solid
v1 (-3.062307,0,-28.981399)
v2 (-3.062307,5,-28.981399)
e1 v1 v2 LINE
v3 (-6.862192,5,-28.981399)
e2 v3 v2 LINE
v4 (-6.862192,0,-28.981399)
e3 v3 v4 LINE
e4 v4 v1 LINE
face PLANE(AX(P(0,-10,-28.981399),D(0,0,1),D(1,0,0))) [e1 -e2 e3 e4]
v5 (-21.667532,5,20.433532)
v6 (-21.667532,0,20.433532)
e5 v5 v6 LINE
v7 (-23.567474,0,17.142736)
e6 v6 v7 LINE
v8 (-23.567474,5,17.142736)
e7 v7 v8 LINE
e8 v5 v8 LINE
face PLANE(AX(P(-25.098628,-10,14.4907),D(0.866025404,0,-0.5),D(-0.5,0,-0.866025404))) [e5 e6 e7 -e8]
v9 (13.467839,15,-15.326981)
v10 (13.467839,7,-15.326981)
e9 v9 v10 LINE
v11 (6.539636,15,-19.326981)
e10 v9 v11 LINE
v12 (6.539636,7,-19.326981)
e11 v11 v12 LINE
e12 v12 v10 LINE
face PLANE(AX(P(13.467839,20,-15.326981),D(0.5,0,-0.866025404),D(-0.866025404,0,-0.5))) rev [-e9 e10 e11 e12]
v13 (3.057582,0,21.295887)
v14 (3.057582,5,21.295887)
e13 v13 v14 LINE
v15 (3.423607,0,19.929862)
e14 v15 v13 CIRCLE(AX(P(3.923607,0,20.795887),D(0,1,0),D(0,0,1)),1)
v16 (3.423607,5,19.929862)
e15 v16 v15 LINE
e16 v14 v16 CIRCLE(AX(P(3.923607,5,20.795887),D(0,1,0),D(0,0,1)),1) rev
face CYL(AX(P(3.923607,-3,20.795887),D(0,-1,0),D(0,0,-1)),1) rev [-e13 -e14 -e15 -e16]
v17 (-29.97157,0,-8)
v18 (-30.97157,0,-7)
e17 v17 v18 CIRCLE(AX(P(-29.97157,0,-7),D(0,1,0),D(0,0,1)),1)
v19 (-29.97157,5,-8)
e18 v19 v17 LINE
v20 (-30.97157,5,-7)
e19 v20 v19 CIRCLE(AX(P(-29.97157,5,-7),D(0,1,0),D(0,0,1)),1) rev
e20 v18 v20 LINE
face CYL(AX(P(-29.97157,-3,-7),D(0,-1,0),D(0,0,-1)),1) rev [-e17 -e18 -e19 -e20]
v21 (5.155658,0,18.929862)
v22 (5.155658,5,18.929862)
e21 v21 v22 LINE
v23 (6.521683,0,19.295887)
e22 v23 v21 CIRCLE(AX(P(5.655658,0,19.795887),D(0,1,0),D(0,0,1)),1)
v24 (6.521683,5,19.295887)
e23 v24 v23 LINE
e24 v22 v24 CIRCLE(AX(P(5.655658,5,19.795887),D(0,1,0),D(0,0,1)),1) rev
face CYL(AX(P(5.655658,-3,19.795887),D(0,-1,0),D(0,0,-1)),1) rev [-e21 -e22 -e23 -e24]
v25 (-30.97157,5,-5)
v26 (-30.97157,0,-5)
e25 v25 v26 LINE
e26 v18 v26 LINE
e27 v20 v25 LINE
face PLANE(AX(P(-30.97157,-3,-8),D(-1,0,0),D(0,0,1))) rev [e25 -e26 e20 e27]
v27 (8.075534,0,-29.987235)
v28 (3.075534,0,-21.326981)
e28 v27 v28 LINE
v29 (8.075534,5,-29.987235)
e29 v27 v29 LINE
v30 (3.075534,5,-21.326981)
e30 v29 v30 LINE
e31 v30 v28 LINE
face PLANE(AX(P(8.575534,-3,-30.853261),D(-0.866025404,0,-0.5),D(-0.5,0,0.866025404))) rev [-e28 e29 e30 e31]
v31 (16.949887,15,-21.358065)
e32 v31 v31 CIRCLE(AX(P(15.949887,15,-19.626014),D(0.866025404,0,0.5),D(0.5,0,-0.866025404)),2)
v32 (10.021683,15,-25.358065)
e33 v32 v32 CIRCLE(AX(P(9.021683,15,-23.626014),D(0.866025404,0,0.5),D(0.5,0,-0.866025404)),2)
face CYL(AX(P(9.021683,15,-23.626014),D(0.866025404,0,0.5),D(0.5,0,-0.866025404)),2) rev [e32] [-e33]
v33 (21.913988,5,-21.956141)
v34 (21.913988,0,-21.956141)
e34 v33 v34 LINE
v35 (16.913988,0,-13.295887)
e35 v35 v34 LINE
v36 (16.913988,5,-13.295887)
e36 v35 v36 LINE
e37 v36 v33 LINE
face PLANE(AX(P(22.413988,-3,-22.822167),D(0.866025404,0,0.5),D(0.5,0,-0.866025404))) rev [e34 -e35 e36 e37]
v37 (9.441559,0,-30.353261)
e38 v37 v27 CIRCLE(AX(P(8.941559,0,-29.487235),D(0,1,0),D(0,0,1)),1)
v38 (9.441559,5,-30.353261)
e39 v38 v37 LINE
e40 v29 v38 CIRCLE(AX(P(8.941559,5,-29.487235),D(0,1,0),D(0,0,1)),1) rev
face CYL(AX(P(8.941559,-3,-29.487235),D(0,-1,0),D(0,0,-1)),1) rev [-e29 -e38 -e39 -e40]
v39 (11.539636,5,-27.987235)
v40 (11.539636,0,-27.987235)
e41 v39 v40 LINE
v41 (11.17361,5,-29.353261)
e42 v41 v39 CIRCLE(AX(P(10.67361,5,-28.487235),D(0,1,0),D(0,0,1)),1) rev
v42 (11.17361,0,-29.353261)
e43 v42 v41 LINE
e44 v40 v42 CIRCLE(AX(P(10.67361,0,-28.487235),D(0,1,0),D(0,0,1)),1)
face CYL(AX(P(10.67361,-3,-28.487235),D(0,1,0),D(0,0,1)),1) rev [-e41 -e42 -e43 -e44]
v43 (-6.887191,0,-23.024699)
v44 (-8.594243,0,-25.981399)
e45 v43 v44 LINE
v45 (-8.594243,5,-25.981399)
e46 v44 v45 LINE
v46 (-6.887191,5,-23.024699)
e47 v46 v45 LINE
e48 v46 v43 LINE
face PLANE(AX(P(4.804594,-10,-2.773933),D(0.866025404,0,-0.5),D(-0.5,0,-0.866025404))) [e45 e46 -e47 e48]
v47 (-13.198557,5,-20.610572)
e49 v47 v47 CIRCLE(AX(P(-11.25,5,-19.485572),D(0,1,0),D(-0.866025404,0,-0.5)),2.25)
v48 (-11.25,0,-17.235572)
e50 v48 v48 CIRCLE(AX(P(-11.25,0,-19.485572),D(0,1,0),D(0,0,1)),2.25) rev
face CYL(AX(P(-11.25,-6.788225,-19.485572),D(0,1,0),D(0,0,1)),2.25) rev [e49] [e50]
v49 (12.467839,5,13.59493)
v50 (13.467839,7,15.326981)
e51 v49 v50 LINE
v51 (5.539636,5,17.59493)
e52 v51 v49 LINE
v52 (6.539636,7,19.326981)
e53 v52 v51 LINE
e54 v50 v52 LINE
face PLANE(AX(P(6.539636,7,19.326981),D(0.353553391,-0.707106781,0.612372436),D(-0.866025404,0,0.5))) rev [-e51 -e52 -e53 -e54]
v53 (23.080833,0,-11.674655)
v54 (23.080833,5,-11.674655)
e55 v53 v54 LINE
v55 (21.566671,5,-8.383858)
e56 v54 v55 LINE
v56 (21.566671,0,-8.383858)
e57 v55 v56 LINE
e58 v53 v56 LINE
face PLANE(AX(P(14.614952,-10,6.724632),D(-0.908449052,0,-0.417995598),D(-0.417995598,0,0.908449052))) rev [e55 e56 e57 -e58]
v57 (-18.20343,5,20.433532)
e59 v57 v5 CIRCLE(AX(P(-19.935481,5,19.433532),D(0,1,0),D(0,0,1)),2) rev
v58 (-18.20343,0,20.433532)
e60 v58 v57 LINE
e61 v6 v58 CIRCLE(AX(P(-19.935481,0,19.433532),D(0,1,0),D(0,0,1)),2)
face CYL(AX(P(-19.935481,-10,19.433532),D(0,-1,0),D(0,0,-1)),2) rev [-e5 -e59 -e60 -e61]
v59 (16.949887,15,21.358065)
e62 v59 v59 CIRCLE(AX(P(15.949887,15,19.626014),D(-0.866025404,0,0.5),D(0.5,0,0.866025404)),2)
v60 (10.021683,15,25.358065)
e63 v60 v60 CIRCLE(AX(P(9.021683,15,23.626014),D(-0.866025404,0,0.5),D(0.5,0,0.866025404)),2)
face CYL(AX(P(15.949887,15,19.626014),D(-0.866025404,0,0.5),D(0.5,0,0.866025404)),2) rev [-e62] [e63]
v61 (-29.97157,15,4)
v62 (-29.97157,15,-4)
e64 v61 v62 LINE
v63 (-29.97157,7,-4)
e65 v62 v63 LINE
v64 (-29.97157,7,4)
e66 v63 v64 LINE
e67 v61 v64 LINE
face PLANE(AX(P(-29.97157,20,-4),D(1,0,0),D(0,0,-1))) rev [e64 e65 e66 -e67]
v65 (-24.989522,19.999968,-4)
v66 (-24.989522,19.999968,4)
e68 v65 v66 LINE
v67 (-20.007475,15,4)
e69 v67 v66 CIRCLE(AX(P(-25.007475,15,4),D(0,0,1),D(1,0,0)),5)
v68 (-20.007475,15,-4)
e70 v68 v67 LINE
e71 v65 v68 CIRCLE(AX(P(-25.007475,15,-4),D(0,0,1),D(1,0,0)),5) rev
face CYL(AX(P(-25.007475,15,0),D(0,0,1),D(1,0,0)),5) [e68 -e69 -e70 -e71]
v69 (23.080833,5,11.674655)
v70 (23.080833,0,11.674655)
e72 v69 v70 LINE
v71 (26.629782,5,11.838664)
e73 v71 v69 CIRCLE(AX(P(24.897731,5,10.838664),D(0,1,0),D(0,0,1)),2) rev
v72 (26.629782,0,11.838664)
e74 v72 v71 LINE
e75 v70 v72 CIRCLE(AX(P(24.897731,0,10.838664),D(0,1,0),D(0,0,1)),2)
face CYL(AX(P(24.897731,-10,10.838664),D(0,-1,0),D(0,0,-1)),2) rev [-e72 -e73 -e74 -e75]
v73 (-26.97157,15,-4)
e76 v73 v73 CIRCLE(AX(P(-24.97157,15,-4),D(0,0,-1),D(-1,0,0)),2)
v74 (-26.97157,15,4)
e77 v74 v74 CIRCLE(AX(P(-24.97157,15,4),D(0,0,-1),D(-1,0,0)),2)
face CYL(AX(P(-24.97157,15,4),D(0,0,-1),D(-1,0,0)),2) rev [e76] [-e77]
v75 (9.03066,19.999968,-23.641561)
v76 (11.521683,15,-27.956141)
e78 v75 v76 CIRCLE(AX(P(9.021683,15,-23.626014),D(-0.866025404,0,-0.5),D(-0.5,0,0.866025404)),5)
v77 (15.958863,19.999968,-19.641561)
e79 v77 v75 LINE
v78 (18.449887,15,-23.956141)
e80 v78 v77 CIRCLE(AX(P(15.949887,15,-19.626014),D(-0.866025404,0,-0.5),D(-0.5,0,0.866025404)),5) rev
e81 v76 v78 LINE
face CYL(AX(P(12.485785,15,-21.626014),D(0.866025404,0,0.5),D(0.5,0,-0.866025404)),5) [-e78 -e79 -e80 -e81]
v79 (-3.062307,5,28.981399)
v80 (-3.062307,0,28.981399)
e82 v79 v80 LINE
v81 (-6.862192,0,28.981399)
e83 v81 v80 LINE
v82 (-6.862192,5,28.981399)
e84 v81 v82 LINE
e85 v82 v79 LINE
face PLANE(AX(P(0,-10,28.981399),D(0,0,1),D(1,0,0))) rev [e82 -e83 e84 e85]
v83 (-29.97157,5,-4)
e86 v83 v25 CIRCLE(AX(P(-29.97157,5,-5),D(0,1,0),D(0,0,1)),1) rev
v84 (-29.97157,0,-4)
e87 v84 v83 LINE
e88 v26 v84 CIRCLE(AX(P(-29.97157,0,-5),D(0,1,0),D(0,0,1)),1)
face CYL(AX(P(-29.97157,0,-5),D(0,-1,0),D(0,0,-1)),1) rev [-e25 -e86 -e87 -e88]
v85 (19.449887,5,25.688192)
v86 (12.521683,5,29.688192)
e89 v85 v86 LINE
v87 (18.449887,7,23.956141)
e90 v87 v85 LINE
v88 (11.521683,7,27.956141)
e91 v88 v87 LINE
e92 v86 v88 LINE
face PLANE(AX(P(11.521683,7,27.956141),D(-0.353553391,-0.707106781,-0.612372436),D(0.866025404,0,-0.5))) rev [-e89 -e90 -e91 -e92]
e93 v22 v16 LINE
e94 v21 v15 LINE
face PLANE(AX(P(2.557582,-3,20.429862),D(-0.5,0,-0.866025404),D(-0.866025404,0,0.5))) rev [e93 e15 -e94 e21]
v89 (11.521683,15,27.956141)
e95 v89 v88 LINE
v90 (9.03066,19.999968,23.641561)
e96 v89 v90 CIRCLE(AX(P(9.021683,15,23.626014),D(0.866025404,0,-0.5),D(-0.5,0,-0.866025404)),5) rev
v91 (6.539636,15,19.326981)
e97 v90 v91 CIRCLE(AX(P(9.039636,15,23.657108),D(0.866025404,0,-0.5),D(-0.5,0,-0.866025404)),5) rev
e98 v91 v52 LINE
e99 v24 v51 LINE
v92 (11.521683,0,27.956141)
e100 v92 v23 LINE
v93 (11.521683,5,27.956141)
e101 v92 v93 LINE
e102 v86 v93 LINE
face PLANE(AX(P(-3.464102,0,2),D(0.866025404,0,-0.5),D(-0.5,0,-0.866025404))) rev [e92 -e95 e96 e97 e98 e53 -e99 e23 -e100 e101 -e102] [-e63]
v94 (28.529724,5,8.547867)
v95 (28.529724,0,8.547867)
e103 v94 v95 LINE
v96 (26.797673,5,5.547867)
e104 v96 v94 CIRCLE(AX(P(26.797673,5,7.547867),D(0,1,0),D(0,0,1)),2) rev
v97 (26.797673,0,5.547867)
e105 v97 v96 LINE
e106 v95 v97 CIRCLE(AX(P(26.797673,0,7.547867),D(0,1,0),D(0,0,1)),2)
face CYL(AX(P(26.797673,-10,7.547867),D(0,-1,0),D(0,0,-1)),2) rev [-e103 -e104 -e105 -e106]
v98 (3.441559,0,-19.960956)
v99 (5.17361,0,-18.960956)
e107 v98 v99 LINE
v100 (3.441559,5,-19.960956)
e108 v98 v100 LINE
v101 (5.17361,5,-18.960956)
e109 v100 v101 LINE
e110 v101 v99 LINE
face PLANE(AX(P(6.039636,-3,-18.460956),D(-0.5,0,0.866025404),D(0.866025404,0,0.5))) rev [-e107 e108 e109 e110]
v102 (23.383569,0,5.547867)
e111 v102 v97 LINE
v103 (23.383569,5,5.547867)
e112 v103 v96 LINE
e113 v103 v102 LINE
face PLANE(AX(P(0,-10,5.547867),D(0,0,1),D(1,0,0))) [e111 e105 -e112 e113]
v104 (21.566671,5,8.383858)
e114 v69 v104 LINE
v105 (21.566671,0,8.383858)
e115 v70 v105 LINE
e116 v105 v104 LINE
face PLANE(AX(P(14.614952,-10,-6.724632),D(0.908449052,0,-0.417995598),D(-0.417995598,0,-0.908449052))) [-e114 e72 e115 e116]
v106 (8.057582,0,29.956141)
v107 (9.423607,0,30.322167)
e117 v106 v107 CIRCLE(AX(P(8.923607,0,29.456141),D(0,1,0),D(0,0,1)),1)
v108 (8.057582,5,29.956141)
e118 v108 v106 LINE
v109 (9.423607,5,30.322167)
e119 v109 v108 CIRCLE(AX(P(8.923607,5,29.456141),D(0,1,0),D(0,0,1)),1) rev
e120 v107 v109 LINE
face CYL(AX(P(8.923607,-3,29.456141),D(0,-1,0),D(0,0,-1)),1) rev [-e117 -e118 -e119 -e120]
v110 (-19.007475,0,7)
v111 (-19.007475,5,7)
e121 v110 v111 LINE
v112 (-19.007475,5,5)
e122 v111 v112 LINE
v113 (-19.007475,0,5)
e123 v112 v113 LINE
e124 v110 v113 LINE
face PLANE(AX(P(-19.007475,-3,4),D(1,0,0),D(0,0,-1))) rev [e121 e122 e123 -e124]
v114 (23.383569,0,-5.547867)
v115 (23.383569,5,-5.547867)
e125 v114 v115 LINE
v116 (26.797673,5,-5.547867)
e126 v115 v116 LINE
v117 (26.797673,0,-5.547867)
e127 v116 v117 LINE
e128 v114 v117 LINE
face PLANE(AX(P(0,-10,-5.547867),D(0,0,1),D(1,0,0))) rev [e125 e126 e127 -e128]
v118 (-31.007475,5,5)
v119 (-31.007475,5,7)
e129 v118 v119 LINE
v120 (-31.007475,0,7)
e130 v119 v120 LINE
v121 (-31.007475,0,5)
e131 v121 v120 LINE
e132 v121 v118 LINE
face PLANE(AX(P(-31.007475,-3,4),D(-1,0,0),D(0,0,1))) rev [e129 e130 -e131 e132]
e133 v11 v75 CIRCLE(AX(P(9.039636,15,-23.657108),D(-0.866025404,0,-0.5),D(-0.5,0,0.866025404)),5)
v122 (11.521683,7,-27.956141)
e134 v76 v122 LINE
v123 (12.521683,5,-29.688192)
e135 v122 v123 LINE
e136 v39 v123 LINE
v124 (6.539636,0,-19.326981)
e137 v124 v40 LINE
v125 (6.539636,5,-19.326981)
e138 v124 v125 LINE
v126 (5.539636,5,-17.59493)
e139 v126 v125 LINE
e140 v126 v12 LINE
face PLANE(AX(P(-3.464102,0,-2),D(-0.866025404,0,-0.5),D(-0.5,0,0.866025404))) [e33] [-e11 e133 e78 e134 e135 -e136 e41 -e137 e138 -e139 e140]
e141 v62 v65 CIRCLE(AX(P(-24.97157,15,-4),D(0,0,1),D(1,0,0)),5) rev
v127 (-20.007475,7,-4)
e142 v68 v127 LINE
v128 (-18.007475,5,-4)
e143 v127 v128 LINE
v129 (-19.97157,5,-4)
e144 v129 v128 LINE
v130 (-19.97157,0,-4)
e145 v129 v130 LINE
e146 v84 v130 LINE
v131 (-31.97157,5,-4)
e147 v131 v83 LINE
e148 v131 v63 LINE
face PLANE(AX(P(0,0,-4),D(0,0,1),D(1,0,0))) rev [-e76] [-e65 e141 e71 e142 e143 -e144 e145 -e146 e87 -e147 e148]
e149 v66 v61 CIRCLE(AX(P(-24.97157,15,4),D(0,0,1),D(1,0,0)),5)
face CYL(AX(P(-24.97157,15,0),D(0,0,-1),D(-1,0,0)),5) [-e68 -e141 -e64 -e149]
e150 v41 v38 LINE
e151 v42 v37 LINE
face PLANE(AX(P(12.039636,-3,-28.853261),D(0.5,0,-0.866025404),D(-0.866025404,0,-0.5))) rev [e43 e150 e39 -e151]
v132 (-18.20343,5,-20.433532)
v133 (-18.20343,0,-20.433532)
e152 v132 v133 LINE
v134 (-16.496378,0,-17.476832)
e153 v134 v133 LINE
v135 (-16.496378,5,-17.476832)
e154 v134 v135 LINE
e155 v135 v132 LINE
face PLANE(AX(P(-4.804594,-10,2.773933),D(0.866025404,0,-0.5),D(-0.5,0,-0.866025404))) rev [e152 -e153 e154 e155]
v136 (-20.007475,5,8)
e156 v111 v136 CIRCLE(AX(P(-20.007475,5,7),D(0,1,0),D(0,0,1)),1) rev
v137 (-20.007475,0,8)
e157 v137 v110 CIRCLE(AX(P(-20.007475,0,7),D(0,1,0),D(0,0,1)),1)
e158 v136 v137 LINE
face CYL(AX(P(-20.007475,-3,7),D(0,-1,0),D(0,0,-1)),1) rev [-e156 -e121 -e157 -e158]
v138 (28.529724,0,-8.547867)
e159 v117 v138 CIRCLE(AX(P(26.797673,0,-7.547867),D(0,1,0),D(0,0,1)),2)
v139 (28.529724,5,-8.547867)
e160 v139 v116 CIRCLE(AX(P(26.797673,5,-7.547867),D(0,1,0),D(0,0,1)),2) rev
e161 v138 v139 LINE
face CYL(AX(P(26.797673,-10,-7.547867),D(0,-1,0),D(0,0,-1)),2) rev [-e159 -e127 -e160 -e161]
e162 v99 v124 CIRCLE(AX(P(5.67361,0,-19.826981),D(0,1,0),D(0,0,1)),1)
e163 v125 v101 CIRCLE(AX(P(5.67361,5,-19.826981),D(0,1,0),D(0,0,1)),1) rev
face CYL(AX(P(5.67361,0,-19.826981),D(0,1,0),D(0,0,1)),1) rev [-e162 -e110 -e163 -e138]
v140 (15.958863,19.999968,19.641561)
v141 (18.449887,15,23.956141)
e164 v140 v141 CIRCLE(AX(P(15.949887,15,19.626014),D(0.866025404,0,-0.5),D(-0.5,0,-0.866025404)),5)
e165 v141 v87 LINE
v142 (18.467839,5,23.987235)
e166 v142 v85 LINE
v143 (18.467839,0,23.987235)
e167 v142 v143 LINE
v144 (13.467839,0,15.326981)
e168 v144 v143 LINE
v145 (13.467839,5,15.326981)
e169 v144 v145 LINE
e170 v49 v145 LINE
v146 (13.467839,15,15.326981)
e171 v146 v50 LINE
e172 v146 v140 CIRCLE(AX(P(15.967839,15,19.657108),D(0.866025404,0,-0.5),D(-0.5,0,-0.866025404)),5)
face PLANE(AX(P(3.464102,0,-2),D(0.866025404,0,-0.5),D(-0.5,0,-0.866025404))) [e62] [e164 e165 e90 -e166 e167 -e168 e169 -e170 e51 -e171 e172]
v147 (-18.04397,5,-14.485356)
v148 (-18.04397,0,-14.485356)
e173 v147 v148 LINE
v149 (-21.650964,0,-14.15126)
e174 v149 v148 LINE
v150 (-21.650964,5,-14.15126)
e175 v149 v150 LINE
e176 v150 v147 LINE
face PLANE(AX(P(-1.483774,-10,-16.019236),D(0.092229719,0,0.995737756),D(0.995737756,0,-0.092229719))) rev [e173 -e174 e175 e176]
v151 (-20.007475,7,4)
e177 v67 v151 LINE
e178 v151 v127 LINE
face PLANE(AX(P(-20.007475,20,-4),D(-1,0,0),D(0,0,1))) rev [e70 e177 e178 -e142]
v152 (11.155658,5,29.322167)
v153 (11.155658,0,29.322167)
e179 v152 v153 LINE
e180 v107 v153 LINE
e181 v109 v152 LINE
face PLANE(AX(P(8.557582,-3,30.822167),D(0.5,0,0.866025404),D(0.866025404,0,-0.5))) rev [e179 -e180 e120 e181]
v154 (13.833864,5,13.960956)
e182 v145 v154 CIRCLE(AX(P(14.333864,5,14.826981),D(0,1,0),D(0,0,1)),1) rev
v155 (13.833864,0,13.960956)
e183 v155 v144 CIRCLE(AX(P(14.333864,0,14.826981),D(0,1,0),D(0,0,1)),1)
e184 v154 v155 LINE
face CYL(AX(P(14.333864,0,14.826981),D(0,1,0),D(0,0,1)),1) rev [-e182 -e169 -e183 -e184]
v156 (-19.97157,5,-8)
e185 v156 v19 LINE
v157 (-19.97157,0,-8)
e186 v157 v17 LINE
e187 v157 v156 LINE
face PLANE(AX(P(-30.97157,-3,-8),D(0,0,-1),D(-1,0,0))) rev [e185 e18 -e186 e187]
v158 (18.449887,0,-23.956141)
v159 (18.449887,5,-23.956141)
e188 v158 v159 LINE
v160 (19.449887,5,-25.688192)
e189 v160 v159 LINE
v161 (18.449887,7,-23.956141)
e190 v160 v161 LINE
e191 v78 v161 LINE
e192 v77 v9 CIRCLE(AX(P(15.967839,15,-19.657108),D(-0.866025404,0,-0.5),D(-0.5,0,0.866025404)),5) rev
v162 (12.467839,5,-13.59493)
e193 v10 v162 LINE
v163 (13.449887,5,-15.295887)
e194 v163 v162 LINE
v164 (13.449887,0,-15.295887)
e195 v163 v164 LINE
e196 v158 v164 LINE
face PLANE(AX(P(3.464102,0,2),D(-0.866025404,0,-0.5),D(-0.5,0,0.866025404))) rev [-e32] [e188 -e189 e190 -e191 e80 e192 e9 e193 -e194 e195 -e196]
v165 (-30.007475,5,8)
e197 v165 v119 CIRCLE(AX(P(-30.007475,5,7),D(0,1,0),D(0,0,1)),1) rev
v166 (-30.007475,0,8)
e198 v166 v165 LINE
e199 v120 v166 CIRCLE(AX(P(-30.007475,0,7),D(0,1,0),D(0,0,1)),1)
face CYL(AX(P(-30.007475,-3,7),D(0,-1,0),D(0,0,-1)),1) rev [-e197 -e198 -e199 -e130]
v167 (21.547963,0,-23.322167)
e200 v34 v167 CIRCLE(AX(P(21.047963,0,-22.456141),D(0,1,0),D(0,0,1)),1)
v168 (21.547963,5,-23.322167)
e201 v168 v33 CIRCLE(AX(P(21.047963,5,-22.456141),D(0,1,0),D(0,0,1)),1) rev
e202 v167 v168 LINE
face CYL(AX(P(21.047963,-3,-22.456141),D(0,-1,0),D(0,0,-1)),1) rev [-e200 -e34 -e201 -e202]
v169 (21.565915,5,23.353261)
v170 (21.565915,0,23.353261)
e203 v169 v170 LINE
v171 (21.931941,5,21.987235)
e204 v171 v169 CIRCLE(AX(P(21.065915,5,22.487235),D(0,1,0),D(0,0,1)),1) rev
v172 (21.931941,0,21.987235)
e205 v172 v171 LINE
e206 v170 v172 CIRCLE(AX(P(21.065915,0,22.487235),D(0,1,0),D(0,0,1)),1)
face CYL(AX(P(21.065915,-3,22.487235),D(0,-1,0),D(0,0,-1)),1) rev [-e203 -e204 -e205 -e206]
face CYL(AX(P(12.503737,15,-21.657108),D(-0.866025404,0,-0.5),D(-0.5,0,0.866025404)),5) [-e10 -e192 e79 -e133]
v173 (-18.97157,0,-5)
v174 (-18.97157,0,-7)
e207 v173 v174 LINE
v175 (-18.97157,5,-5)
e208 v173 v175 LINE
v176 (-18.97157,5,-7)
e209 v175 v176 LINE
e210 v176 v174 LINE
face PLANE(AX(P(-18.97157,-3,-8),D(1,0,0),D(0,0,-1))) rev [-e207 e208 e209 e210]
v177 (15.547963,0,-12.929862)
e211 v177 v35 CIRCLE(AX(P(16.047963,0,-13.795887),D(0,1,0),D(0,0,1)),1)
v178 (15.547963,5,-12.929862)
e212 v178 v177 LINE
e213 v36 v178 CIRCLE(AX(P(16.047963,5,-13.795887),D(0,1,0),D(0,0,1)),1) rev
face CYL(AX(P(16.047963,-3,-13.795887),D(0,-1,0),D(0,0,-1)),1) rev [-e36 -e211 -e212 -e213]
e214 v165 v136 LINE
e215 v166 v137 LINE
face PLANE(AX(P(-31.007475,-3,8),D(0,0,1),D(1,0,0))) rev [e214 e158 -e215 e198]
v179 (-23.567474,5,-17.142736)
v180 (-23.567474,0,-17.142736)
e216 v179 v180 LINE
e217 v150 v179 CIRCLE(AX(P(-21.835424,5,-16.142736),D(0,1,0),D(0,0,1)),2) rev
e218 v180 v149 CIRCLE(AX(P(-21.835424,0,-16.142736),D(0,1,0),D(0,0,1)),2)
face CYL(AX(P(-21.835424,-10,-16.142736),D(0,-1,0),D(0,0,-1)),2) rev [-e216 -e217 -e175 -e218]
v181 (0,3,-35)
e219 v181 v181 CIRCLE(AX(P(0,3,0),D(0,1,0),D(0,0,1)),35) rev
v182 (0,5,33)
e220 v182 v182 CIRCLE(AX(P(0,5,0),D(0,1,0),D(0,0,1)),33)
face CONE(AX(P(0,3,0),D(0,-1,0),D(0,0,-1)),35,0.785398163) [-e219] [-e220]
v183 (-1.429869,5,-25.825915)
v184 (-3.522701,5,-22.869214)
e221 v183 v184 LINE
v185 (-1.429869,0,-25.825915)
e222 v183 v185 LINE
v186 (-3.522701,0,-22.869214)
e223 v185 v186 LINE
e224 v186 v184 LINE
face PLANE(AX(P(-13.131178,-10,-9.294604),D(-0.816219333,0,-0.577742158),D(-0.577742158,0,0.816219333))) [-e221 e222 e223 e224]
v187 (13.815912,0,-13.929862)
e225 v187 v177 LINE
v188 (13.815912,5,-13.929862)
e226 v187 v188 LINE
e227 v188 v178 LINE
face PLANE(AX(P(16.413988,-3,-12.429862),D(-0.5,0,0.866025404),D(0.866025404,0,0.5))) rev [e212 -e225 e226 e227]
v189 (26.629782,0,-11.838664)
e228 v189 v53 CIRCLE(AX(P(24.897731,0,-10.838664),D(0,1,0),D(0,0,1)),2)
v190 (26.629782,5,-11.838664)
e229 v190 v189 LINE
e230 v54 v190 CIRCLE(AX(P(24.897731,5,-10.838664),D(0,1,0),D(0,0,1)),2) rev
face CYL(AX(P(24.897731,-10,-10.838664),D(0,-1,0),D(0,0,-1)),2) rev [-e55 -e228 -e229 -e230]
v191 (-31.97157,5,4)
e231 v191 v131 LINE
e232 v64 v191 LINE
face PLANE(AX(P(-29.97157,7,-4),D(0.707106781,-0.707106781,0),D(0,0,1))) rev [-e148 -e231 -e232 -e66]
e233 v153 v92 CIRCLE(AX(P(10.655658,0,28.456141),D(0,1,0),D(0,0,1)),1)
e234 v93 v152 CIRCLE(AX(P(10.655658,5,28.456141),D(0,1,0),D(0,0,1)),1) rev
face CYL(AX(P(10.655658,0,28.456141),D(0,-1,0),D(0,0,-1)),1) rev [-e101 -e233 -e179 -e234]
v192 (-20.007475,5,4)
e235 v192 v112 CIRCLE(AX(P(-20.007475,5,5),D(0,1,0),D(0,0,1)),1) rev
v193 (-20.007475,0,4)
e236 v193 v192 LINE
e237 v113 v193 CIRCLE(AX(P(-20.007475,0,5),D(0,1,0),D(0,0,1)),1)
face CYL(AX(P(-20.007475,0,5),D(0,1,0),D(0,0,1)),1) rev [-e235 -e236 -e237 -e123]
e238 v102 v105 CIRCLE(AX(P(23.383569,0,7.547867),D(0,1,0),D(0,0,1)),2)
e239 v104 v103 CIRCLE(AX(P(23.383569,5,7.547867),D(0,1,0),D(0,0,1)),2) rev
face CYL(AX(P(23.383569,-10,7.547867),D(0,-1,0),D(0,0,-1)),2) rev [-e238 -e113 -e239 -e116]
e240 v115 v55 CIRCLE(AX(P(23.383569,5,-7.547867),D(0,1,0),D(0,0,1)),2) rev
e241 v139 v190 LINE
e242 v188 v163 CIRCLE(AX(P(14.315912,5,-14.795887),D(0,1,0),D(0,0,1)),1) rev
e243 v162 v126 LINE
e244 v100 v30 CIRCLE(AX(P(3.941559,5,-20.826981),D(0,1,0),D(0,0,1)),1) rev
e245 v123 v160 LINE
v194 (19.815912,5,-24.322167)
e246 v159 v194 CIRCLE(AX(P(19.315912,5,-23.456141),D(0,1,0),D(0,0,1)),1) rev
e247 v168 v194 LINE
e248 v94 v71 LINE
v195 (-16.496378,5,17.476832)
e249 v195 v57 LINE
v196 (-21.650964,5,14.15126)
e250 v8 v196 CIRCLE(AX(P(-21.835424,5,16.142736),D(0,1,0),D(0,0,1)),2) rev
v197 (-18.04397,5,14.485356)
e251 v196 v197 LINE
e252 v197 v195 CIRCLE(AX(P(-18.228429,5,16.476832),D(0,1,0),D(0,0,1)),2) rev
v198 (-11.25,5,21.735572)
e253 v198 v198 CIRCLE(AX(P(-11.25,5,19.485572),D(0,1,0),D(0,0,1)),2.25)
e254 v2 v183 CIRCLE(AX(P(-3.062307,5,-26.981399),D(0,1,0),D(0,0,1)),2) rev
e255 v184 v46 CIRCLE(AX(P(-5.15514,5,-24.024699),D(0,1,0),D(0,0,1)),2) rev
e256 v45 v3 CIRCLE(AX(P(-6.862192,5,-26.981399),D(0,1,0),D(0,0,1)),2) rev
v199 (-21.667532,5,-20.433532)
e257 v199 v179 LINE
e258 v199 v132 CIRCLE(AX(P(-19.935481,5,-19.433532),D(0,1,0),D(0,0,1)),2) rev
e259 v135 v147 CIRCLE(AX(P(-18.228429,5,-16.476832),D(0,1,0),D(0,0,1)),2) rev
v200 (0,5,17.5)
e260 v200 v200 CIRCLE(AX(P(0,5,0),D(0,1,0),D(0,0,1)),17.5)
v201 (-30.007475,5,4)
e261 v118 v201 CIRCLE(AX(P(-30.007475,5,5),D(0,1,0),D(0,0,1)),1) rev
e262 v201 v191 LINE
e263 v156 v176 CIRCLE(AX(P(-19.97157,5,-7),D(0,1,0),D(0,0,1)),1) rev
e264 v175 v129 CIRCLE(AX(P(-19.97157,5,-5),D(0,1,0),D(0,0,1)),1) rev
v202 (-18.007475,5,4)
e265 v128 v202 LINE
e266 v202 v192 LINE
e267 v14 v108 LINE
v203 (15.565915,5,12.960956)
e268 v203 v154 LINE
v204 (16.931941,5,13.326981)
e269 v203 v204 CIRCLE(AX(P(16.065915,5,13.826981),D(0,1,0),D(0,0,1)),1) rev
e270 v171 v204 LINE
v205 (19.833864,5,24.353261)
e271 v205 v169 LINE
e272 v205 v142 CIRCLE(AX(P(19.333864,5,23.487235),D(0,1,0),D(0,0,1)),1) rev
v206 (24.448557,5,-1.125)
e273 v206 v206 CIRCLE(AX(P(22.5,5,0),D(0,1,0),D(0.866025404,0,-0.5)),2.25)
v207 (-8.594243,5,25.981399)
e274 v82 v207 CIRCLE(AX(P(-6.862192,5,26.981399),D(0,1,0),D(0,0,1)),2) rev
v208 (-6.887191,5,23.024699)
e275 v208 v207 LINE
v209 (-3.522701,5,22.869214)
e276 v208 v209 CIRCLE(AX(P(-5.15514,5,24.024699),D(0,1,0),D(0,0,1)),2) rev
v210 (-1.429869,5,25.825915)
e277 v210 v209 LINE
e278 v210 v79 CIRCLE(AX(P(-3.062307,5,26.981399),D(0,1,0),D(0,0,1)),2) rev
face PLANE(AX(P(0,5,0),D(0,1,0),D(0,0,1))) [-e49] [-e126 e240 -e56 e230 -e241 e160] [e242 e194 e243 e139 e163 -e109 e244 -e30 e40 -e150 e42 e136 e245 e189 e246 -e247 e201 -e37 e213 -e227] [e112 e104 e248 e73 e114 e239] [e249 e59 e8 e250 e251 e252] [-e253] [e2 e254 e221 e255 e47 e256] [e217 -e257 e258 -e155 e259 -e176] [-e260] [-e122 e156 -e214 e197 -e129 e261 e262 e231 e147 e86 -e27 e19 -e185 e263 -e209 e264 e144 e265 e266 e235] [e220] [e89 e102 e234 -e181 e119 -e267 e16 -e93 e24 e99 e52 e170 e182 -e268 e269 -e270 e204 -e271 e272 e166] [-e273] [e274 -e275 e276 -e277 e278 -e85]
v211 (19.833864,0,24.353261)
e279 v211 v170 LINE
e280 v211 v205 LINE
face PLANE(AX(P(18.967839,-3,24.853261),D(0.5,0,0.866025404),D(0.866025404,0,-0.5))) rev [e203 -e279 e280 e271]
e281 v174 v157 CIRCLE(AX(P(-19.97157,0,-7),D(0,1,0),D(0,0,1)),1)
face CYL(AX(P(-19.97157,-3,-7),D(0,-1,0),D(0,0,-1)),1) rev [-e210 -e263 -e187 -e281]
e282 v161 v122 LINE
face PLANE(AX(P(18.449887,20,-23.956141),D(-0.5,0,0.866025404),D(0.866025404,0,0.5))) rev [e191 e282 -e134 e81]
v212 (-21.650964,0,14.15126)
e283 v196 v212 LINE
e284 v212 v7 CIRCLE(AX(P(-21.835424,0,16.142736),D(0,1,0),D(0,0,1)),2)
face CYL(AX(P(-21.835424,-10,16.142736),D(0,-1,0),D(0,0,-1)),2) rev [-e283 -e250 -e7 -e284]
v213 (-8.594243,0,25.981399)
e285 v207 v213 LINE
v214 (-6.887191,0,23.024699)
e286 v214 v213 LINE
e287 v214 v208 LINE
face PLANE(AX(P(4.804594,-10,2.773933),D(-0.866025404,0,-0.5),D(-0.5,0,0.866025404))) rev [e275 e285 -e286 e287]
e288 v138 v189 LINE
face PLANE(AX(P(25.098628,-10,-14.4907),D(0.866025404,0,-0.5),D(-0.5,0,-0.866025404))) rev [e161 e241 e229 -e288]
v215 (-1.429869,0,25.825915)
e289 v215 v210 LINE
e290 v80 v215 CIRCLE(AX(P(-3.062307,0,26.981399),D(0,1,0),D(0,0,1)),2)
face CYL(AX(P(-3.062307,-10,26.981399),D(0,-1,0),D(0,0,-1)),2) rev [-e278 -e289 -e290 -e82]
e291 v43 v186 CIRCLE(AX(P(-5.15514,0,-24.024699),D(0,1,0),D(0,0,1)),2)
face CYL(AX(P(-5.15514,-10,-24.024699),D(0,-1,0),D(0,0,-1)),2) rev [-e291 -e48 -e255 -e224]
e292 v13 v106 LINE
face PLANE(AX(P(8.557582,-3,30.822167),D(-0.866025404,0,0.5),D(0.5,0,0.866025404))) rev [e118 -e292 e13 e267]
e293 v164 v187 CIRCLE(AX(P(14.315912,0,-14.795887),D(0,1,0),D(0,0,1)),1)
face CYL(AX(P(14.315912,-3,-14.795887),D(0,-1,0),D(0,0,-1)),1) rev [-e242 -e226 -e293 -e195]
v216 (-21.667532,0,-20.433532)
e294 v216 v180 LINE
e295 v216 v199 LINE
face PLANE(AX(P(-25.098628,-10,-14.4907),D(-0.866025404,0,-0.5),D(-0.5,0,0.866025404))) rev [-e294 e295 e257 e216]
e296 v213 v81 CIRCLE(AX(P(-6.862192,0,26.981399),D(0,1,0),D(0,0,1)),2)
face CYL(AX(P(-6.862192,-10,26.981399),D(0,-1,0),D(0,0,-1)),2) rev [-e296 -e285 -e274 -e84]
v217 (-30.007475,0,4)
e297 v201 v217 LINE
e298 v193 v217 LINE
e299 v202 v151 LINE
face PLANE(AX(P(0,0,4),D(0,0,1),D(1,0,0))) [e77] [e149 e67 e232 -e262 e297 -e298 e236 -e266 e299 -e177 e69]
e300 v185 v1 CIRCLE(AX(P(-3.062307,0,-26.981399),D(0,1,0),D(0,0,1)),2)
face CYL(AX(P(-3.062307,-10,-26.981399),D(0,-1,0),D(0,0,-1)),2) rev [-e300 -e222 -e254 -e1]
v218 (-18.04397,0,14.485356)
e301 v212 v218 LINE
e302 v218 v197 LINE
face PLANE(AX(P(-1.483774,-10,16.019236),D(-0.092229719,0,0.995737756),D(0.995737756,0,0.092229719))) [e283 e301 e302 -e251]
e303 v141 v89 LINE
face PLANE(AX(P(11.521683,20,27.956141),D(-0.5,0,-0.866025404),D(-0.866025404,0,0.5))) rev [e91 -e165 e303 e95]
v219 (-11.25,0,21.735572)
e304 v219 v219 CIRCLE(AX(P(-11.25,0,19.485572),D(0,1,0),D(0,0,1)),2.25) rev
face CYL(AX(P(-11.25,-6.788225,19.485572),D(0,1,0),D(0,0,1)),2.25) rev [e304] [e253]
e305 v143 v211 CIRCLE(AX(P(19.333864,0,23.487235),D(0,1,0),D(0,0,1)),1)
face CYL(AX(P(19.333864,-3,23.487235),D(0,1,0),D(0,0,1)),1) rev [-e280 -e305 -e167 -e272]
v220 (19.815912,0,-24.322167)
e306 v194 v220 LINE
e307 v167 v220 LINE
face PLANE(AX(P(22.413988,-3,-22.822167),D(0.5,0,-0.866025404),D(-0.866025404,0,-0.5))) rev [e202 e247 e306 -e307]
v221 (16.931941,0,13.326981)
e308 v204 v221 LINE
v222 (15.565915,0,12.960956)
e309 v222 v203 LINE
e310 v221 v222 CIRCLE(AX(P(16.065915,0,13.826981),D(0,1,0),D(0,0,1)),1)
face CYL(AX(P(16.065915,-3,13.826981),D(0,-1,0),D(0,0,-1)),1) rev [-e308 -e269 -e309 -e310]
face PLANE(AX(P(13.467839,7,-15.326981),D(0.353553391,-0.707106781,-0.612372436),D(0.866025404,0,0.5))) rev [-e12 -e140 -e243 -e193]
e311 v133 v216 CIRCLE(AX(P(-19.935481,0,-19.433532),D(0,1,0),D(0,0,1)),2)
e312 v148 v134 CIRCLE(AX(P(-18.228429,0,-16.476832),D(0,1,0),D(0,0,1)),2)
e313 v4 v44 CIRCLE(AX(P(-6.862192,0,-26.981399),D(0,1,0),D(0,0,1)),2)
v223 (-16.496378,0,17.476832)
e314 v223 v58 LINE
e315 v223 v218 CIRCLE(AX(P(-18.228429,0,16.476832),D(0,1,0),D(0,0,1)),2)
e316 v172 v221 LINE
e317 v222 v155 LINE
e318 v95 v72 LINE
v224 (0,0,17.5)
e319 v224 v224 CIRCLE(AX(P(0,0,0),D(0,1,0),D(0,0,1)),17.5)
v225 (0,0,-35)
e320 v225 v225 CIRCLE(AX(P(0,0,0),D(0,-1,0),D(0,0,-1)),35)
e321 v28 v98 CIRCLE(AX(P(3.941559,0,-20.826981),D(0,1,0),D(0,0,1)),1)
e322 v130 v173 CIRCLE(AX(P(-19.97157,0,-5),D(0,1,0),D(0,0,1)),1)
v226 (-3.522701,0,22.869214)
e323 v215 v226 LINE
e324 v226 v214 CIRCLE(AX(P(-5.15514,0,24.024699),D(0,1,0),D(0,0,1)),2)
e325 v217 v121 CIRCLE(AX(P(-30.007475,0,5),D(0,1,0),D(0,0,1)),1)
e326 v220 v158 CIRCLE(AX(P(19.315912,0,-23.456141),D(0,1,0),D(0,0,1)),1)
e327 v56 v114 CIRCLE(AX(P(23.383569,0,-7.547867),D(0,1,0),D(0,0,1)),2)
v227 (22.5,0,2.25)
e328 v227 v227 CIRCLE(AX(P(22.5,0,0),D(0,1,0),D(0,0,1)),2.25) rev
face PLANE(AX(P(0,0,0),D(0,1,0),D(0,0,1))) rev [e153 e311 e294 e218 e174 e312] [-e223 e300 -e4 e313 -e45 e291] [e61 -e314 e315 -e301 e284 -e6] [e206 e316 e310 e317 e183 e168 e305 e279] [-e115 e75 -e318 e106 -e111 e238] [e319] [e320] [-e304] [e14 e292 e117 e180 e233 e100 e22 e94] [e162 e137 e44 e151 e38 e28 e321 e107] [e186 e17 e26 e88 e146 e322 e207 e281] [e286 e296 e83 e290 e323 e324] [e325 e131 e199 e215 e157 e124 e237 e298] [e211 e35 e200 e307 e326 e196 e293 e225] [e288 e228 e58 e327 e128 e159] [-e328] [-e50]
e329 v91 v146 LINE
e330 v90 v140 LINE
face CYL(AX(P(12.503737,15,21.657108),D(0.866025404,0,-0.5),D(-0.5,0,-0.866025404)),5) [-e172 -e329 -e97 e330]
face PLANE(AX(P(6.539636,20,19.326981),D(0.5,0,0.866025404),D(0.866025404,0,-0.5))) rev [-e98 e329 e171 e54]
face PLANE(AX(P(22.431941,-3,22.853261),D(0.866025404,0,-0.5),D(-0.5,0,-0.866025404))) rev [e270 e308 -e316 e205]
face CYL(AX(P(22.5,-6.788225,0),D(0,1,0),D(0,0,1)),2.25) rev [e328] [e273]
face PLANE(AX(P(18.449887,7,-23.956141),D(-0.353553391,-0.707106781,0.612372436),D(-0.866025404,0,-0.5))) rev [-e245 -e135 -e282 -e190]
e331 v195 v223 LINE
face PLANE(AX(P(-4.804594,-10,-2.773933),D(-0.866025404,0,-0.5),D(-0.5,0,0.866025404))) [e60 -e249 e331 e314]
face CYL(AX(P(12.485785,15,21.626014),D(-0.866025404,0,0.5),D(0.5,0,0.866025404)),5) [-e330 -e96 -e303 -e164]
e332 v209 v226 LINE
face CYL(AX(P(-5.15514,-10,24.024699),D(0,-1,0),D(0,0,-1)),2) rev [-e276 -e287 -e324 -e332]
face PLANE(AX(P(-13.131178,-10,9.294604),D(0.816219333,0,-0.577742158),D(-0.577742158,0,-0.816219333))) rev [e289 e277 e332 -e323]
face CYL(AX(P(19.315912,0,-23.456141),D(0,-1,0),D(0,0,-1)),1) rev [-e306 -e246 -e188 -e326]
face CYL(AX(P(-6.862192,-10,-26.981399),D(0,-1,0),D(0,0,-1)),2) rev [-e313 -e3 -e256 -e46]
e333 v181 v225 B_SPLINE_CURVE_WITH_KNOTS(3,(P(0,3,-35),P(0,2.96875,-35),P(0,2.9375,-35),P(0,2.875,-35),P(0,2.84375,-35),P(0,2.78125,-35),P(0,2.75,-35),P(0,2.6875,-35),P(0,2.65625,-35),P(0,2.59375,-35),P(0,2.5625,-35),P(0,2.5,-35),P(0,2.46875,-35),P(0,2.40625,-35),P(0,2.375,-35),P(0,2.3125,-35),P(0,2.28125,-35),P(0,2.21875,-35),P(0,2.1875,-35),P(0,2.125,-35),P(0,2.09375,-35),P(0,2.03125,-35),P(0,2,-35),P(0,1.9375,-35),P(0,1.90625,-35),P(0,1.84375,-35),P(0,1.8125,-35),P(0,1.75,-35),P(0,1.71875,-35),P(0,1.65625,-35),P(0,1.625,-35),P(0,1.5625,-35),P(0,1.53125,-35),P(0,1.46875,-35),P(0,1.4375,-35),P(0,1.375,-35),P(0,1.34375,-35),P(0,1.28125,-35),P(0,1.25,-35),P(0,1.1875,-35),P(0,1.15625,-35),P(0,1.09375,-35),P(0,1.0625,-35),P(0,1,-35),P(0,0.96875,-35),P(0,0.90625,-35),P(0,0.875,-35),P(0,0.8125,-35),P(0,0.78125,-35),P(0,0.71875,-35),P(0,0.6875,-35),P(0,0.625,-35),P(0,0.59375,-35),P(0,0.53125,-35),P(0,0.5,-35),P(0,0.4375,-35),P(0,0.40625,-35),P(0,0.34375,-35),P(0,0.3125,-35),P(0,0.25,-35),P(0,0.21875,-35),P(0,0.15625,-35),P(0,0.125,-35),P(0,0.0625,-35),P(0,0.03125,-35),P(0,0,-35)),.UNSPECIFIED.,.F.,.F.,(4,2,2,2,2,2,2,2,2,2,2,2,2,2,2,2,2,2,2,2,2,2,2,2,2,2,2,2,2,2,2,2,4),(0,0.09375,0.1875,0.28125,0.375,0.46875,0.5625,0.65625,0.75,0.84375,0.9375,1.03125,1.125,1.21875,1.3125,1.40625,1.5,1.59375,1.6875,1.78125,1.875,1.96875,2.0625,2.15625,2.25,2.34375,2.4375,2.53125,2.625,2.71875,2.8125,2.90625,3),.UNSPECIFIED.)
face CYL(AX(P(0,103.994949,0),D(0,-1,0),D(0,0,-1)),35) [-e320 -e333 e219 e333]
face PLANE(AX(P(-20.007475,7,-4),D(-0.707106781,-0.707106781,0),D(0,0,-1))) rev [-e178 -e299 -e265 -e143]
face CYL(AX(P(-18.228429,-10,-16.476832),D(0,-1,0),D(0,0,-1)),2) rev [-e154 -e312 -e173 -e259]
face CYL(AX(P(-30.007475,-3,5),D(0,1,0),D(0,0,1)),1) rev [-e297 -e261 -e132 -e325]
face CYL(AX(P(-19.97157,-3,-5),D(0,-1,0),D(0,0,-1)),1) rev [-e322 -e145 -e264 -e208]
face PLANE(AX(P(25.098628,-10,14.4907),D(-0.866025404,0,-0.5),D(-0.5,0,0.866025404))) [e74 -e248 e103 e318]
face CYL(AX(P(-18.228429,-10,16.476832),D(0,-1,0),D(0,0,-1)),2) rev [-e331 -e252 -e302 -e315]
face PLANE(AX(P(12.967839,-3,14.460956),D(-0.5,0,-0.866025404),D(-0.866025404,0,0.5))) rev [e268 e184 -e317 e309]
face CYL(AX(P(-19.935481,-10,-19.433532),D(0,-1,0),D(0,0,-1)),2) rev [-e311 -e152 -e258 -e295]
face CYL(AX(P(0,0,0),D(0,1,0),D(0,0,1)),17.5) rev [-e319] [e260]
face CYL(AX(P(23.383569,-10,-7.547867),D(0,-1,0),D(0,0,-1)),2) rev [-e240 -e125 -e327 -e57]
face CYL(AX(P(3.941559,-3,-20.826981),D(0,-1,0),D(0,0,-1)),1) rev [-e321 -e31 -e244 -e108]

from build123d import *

# Parameters (mm, degrees)
SKETCH_1_R                       = 30
EXTRUDE_1_DEPTH                  = 5
SKETCH_2_R                       = 17.5
CUT_EXTRUDE_1_DEPTH              = 5
SKETCH_4_W                       = 3
SKETCH_4_H                       = 6
EXTRUDE_2_DEPTH                  = 4
FILLET_1_R                       = 2
SKETCH_5_R                       = 1.5
CUT_EXTRUDE_2_DEPTH              = 47.658332589
PATTERN_CIRCULAR_1_COUNT         = 3
FILLET_1_OF_PATTERN_CIRCULAR_1_R = 2
EXTRUDE_3_DEPTH                  = 8
PATTERN_CIRCULAR_2_COUNT         = 3
SKETCH_10_R                      = 35
SKETCH_10_R_2                    = 30
EXTRUDE_4_DEPTH                  = 5
SKETCH_11_W                      = 12
SKETCH_11_H                      = 4
CUT_EXTRUDE_3_DEPTH              = 8
PATTERN_CIRCULAR_3_COUNT         = 3
SKETCH_12_W                      = 12
SKETCH_12_H                      = 4
CUT_EXTRUDE_4_DEPTH              = 8
PATTERN_CIRCULAR_4_COUNT         = 3
FILLET_2_R                       = 1
FILLET_3_R                       = 1
CHAMFER_1_SIZE                   = 2
SKETCH_13_R                      = 2.4
CUT_EXTRUDE_5_DEPTH              = 8
PATTERN_CIRCULAR_7_COUNT         = 3
SKETCH_19_W                      = 88.76587097
SKETCH_19_H                      = 64.837679665
CUT_EXTRUDE_10_DEPTH             = 10
SKETCH_20_W                      = 9.964095652
SKETCH_20_H                      = 8
EXTRUDE_6_DEPTH                  = 15
FILLET_4_R                       = 5
SKETCH_21_R                      = 1.75
CUT_EXTRUDE_11_DEPTH             = 15
CHAMFER_2_SIZE                   = 2
PATTERN_START                    = -4
PATTERN_CIRCULAR_8_OUTLINE_R     = 1.75
PATTERN_CIRCULAR_8_DEPTH         = 8
PATTERN_CIRCULAR_8_2_OUTLINE_R   = 1.75
PATTERN_CIRCULAR_8_2_DEPTH       = 8
CUT_EXTRUDE_12_DEPTH             = 15
FILLET_5_R                       = 2
FILLET_6_R                       = 2
PATTERN_CIRCULAR_9_COUNT         = 3
FILLET_5_OF_PATTERN_CIRCULAR_9_R = 2
FILLET_6_OF_PATTERN_CIRCULAR_9_R = 2
SKETCH_23_R                      = 2.4
SKETCH_23_R_2                    = 2.25
EXTRUDE_7_DEPTH                  = 5
PATTERN_CIRCULAR_10_COUNT        = 3
SKETCH_24_R                      = 2.25
CUT_EXTRUDE_13_DEPTH             = 10
PATTERN_CIRCULAR_11_COUNT        = 3
EXTRUDE_START                    = -8
SKETCH_30_R                      = 2.25
SKETCH_30_R_2                    = 1.5
EXTRUDE_8_DEPTH                  = 8
SKETCH_31_R                      = 2.25
SKETCH_31_R_2                    = 1.5
EXTRUDE_9_DEPTH                  = 8
SKETCH_32_R                      = 2.25
SKETCH_32_R_2                    = 1.5
EXTRUDE_10_DEPTH                 = 8
SKETCH_33_R                      = 2
CUT_EXTRUDE_14_DEPTH             = 8
PATTERN_CIRCULAR_13_COUNT        = 3


# Read off the part's stored shape, not the designer's step: 阵列(圆周)8
with BuildPart() as part:
    # 草图1 → 凸台-拉伸1 (new body)
    with BuildSketch(Plane(origin=(0, 0, 0), x_dir=(1, 0, 0), z_dir=(0, 1, 0))):
        with Locations(Location((0, 0, 0), (0, 0, 270))):
            Circle(SKETCH_1_R)
    extrude(amount=EXTRUDE_1_DEPTH)

    # 草图2 → 切除-拉伸1 (cut)
    with BuildSketch(Plane(origin=(0, 5, 0), x_dir=(1, 0, 0), z_dir=(0, 1, 0))):
        with Locations(Location((0, 0, 0), (0, 0, 270))):
            Circle(SKETCH_2_R)
    extrude(amount=-CUT_EXTRUDE_1_DEPTH, mode=Mode.SUBTRACT)

    # 草图4 → 凸台-拉伸2 (add, symmetric)
    with BuildSketch(Plane.XY):
        with Locations((-26.5, 8)):
            Rectangle(SKETCH_4_W, SKETCH_4_H)
        with Locations((-23.5, 8)):
            Rectangle(SKETCH_4_W, SKETCH_4_H)
    extrude_2 = extrude(amount=EXTRUDE_2_DEPTH, both=True)

    # 圆角1
    fillet_1_edges = [part.edges().sort_by_distance(p)[0] for p in [
        (-28, 11, 0),
        (-22, 11, 0),
    ]]
    fillet(fillet_1_edges, radius=FILLET_1_R)

    # 草图5 → 切除-拉伸2 (cut, through all)
    with BuildSketch(Plane.XY.offset(4)):
        with Locations((-25, 8)):
            Circle(SKETCH_5_R)
    cut_extrude_2 = extrude(amount=-CUT_EXTRUDE_2_DEPTH, mode=Mode.SUBTRACT)

    # 阵列(圆周)1: 凸台-拉伸2, 切除-拉伸2 ×3 about axis
    pattern_circular_1_axis = Axis((0, 0, 0), (0, 1, 0))
    add([extrude_2.rotate(pattern_circular_1_axis, i * 360 / PATTERN_CIRCULAR_1_COUNT) for i in range(1, PATTERN_CIRCULAR_1_COUNT)])
    add([cut_extrude_2.rotate(pattern_circular_1_axis, i * 360 / PATTERN_CIRCULAR_1_COUNT) for i in range(1, PATTERN_CIRCULAR_1_COUNT)], mode=Mode.SUBTRACT)

    # 圆角1 of 阵列(圆周)1
    fillet_1_of_pattern_circular_1_edges = [part.edges().sort_by_distance(p)[0] for p in [
        (14, 11, 24.248711306),
        (11, 11, 19.052558883),
        (14, 11, -24.248711306),
        (11, 11, -19.052558883),
    ]]
    fillet(fillet_1_of_pattern_circular_1_edges, radius=FILLET_1_OF_PATTERN_CIRCULAR_1_R)

    # 草图7 → 凸台-拉伸3 (add)
    with BuildSketch(Plane(origin=(3.464101615, 0, -2), x_dir=(-0.500000000000004, 0, -0.8660254037844364), z_dir=(0.8660254037844365, 0, -0.500000000000004))):
        with BuildLine():
            Line((-22, 5), (-21, 5))
            Line((-21, 5), (-21, 9))
            ThreePointArc((-21, 9), (-21.878679656, 11.121320344), (-24, 12))
            Line((-24, 12), (-26, 12))
            ThreePointArc((-26, 12), (-28.121320344, 11.121320344), (-29, 9))
            Line((-29, 9), (-29, 5))
            Line((-29, 5), (-28, 5))
            Line((-28, 5), (-28, 9))
            ThreePointArc((-28, 9), (-27.414213562, 10.414213562), (-26, 11))
            Line((-26, 11), (-24, 11))
            ThreePointArc((-24, 11), (-22.585786438, 10.414213562), (-22, 9))
            Line((-22, 9), (-22, 5))
        make_face()
    extrude_3 = extrude(amount=-EXTRUDE_3_DEPTH)

    # 阵列(圆周)2: 凸台-拉伸3 ×3 about axis
    pattern_circular_2_axis = Axis((0, 0, 0), (0, 1, 0))
    for i in range(1, PATTERN_CIRCULAR_2_COUNT):
        add(extrude_3.rotate(pattern_circular_2_axis, i * 360 / PATTERN_CIRCULAR_2_COUNT))

    # 草图10 → 凸台-拉伸4 (add)
    with BuildSketch(Plane.XZ):
        with Locations(Location((0, 0, 0), (0, 0, 270))):
            Circle(SKETCH_10_R)
        Circle(SKETCH_10_R_2, mode=Mode.SUBTRACT)
    extrude(amount=-EXTRUDE_4_DEPTH)

    # 草图11 → 切除-拉伸3 (cut)
    with BuildSketch(Plane(origin=(0, 5, 0), x_dir=(1, 0, 0), z_dir=(0, 1, 0))):
        with Locations((-24.971570197, 6)):
            Rectangle(SKETCH_11_W, SKETCH_11_H)
    cut_extrude_3 = extrude(amount=-CUT_EXTRUDE_3_DEPTH, mode=Mode.SUBTRACT)

    # 阵列(圆周)3: 切除-拉伸3 ×3 about axis
    pattern_circular_3_axis = Axis((0, 0, 0), (0, 1, 0))
    for i in range(1, PATTERN_CIRCULAR_3_COUNT):
        add(cut_extrude_3.rotate(pattern_circular_3_axis, i * 360 / PATTERN_CIRCULAR_3_COUNT), mode=Mode.SUBTRACT)

    # 草图12 → 切除-拉伸4 (cut)
    with BuildSketch(Plane(origin=(0, 5, 0), x_dir=(1, 0, 0), z_dir=(0, 1, 0))):
        with Locations((-25.007474545, -6)):
            Rectangle(SKETCH_12_W, SKETCH_12_H)
    cut_extrude_4 = extrude(amount=-CUT_EXTRUDE_4_DEPTH, mode=Mode.SUBTRACT)

    # 阵列(圆周)4: 切除-拉伸4 ×3 about axis
    pattern_circular_4_axis = Axis((0, 0, 0), (0, 1, 0))
    for i in range(1, PATTERN_CIRCULAR_4_COUNT):
        add(cut_extrude_4.rotate(pattern_circular_4_axis, i * 360 / PATTERN_CIRCULAR_4_COUNT), mode=Mode.SUBTRACT)

    # 圆角2
    fillet_2_edges = [part.edges().sort_by_distance(p)[0] for p in [
        (-30.971570197, 2.5, -4),
        (-30.971570197, 2.5, -8),
        (-18.971570197, 2.5, -8),
        (-18.971570197, 2.5, -4),
        (-31.007474545, 2.5, 8),
        (-31.007474545, 2.5, 4),
        (-19.007474545, 2.5, 4),
        (-19.007474545, 2.5, 8),
    ]]
    fillet(fillet_2_edges, radius=FILLET_2_R)

    # 圆角3
    fillet_3_edges = [part.edges().sort_by_distance(p)[0] for p in [
        (18.949886714, 2.5, -24.822166586),
        (22.413988329, 2.5, -22.822166586),
        (16.413988329, 2.5, -12.42986174),
        (12.949886714, 2.5, -14.42986174),
        (12.021683483, 2.5, 28.822166586),
        (8.557581868, 2.5, 30.822166586),
        (2.557581868, 2.5, 20.42986174),
        (6.021683483, 2.5, 18.42986174),
        (8.575534042, 2.5, -30.853260663),
        (12.039635657, 2.5, -28.853260663),
        (6.039635657, 2.5, -18.460955817),
        (2.575534042, 2.5, -20.460955817),
        (22.431940503, 2.5, 22.853260663),
        (18.967838887, 2.5, 24.853260663),
        (12.967838887, 2.5, 14.460955817),
        (16.431940503, 2.5, 12.460955817),
    ]]
    fillet(fillet_3_edges, radius=FILLET_3_R)

    # 倒角1
    chamfer_1_edges = [part.edges().sort_by_distance(p)[0] for p in [
        (0, 5, 35),
    ]]
    chamfer(chamfer_1_edges, length=CHAMFER_1_SIZE)

    # 草图13 → 切除-拉伸5 (cut)
    with BuildSketch(Plane(origin=(0, 5, 0), x_dir=(1, 0, 0), z_dir=(0, 1, 0))):
        with Locations(Location((22.5, 0, 0), (0, 0, 270))):
            Circle(SKETCH_13_R)
    cut_extrude_5 = extrude(amount=-CUT_EXTRUDE_5_DEPTH, mode=Mode.SUBTRACT)

    # 阵列(圆周)7: 切除-拉伸5 ×3 about axis
    pattern_circular_7_axis = Axis((0, 0, 0), (0, 1, 0))
    for i in range(1, PATTERN_CIRCULAR_7_COUNT):
        add(cut_extrude_5.rotate(pattern_circular_7_axis, i * 360 / PATTERN_CIRCULAR_7_COUNT), mode=Mode.SUBTRACT)

    # 草图19 → 切除-拉伸10 (cut)
    with BuildSketch(Plane(origin=(0, 5, 0), x_dir=(1, 0, 0), z_dir=(0, 1, 0))):
        with Locations((1.350784993, -0.723634818)):
            Rectangle(SKETCH_19_W, SKETCH_19_H)
    extrude(amount=CUT_EXTRUDE_10_DEPTH, mode=Mode.SUBTRACT)

    # 草图20 → 凸台-拉伸6 (add)
    with BuildSketch(Plane(origin=(0, 5, 0), x_dir=(1, 0, 0), z_dir=(0, 1, 0))):
        with Locations((-24.989522371, 0)):
            Rectangle(SKETCH_20_W, SKETCH_20_H)
    extrude(amount=EXTRUDE_6_DEPTH)

    # 圆角4
    # the kernel refuses this fillet: 5 mm, written as the material it takes off along each edge
    with BuildSketch(Plane(origin=(-20.007474545, 20, -16.5), x_dir=(0, -1, 0), z_dir=(0, 0, 1)), Plane(origin=(-29.971570197, 20, 16.5), x_dir=(0, -1, 0), z_dir=(0, 0, -1))) as fillet_4_piece_1:
        with BuildLine():
            CenterArc((FILLET_4_R, -FILLET_4_R), FILLET_4_R, 90, 90)
            Line((0, -FILLET_4_R), (0, 0))
            Line((0, 0), (FILLET_4_R, 0))
        make_face()
    extrude(amount=33, mode=Mode.SUBTRACT)

    # 草图21 → 切除-拉伸11 (cut)
    with BuildSketch(Plane.XY.offset(4)):
        with Locations((-24.971570197, 15)):
            Circle(SKETCH_21_R)
    extrude(amount=-CUT_EXTRUDE_11_DEPTH, mode=Mode.SUBTRACT)

    # 倒角2
    # the kernel refuses this chamfer: 2 mm, written as the material it adds along each edge
    with BuildSketch(Plane(origin=(-29.971570197, 5, 4), x_dir=(-0.9996219169112968, -0.027495876610586462, 0), z_dir=(0, 0, -1)), Plane(origin=(-20.007474545, 5, -4), x_dir=(0.9996219169112968, -0.02749587661058651, 0), z_dir=(0, 0, 1))) as chamfer_2_piece_1:
        Polygon((CHAMFER_2_SIZE * 0.999621916911, CHAMFER_2_SIZE * 0.0274958766106), (-CHAMFER_2_SIZE * 0.0274958766106, CHAMFER_2_SIZE * 0.999621916911), (0, 0), align=None)
    extrude(amount=8)

    # 阵列(圆周)8 outline → 阵列(圆周)8 (add)
    with BuildSketch(Plane(origin=(0, 0, 0), x_dir=(0.500000000000004, 0, 0.8660254037844363), z_dir=(0.8660254037844363, 0, -0.5000000000000042)).offset(PATTERN_START)):
        with BuildLine():
            Line((29.971570197, -15), (29.971570197, -7))
            Line((29.971570197, -7), (31.971570197, -5))
            Line((31.971570197, -5), (18.007474545, -5))
            Line((18.007474545, -5), (20.007474545, -7))
            Line((20.007474545, -7), (20.007474545, -15))
            ThreePointArc((20.007474545, -15), (21.465599274, -18.529181147), (24.989522371, -19.999967772))
            ThreePointArc((24.989522371, -19.999967772), (28.513445468, -18.529181147), (29.971570197, -15))
        make_face()
        with Locations((24.971570197, -15)):
            Circle(PATTERN_CIRCULAR_8_OUTLINE_R, mode=Mode.SUBTRACT)
    extrude(amount=PATTERN_CIRCULAR_8_DEPTH)

    # Pattern Circular 8 2 outline → Pattern Circular 8 2 (add)
    with BuildSketch(Plane(origin=(0, 0, 0), x_dir=(0.49999999999999195, 0, -0.8660254037844434), z_dir=(0.8660254037844433, 0, 0.4999999999999921)).offset(PATTERN_START)):
        with BuildLine():
            Line((29.971570197, 7), (29.971570197, 15))
            ThreePointArc((29.971570197, 15), (28.513445468, 18.529181147), (24.989522371, 19.999967772))
            ThreePointArc((24.989522371, 19.999967772), (21.465599274, 18.529181147), (20.007474545, 15))
            Line((20.007474545, 15), (20.007474545, 7))
            Line((20.007474545, 7), (18.007474545, 5))
            Line((18.007474545, 5), (31.971570197, 5))
            Line((31.971570197, 5), (29.971570197, 7))
        make_face()
        with Locations((24.971570197, 15)):
            Circle(PATTERN_CIRCULAR_8_2_OUTLINE_R, mode=Mode.SUBTRACT)
    extrude(amount=PATTERN_CIRCULAR_8_2_DEPTH)

    # 草图22 → 切除-拉伸12 (cut)
    with BuildSketch(Plane(origin=(0, 5, 0), x_dir=(1, 0, 0), z_dir=(0, 1, 0))):
        Polygon((20.261774895, -5.547866936), (30.261774895, -5.547866936), (24.696793672, -15.186697158), align=None)
        Polygon((30.261774895, 5.547866936), (24.696793672, 15.186697158), (20.261774895, 5.547866936), align=None)
    cut_extrude_12 = extrude(amount=-CUT_EXTRUDE_12_DEPTH, mode=Mode.SUBTRACT)

    # 圆角5
    fillet_5_edges = [part.edges().sort_by_distance(p)[0] for p in [
        (24.696793672, 2.5, -15.186697158),
        (30.261774895, 2.5, -5.547866936),
        (20.261774895, 2.5, -5.547866936),
    ]]
    fillet(fillet_5_edges, radius=FILLET_5_R)

    # 圆角6
    fillet_6_edges = [part.edges().sort_by_distance(p)[0] for p in [
        (20.261774895, 2.5, 5.547866936),
        (30.261774895, 2.5, 5.547866936),
        (24.696793672, 2.5, 15.186697158),
    ]]
    fillet(fillet_6_edges, radius=FILLET_6_R)

    # 阵列(圆周)9: 切除-拉伸12 ×3 about axis
    pattern_circular_9_axis = Axis((0, 0, 0), (0, 1, 0))
    for i in range(1, PATTERN_CIRCULAR_9_COUNT):
        add(cut_extrude_12.rotate(pattern_circular_9_axis, i * 360 / PATTERN_CIRCULAR_9_COUNT), mode=Mode.SUBTRACT)

    # 圆角5 of 阵列(圆周)9
    fillet_5_of_pattern_circular_9_edges = [part.edges().sort_by_distance(p)[0] for p in [
        (-25.500462374, 2.5, -13.794702133),
        (-19.935481151, 2.5, -23.433532355),
        (-14.935481151, 2.5, -14.773278317),
        (0.803668702, 2.5, 28.981399291),
        (-10.326293745, 2.5, 28.981399291),
        (-5.326293745, 2.5, 20.321145253),
    ]]
    fillet(fillet_5_of_pattern_circular_9_edges, radius=FILLET_5_OF_PATTERN_CIRCULAR_9_R)

    # 圆角6 of 阵列(圆周)9
    fillet_6_of_pattern_circular_9_edges = [part.edges().sort_by_distance(p)[0] for p in [
        (-5.326293745, 2.5, -20.321145253),
        (-10.326293745, 2.5, -28.981399291),
        (0.803668702, 2.5, -28.981399291),
        (-14.935481151, 2.5, 14.773278317),
        (-19.935481151, 2.5, 23.433532355),
        (-25.500462374, 2.5, 13.794702133),
    ]]
    fillet(fillet_6_of_pattern_circular_9_edges, radius=FILLET_6_OF_PATTERN_CIRCULAR_9_R)

    # 草图23 → 凸台-拉伸7 (add)
    with BuildSketch(Plane(origin=(0, 5, 0), x_dir=(1, 0, 0), z_dir=(0, 1, 0))):
        with Locations((-11.25, -19.485571585)):
            Circle(SKETCH_23_R)
        with Locations(Location((-11.25, -19.485571585, 0), (0, 0, 270))):
            Circle(SKETCH_23_R_2, mode=Mode.SUBTRACT)
    extrude_7 = extrude(amount=-EXTRUDE_7_DEPTH)

    # 阵列(圆周)10: 凸台-拉伸7 ×3 about axis
    pattern_circular_10_axis = Axis((0, 0, 0), (0, 1, 0))
    for i in range(1, PATTERN_CIRCULAR_10_COUNT):
        add(extrude_7.rotate(pattern_circular_10_axis, i * 360 / PATTERN_CIRCULAR_10_COUNT))

    # 草图24 → 切除-拉伸13 (cut)
    with BuildSketch(Plane(origin=(-3.464101615, 0, 2), x_dir=(0.500000000000004, 0, 0.8660254037844364), z_dir=(-0.8660254037844365, 0, 0.500000000000004))):
        with Locations((24.971570197, 15)):
            Circle(SKETCH_24_R)
    cut_extrude_13 = extrude(amount=-CUT_EXTRUDE_13_DEPTH, mode=Mode.SUBTRACT)

    # 阵列(圆周)11: 切除-拉伸13 ×3 about axis
    pattern_circular_11_axis = Axis((0, 0, 0), (0, 1, 0))
    for i in range(1, PATTERN_CIRCULAR_11_COUNT):
        add(cut_extrude_13.rotate(pattern_circular_11_axis, i * 360 / PATTERN_CIRCULAR_11_COUNT), mode=Mode.SUBTRACT)

    # 草图30 → 凸台-拉伸8 (add)
    with BuildSketch(Plane.XY.offset(4).offset(EXTRUDE_START)):
        with Locations((-24.971570197, 15)):
            Circle(SKETCH_30_R)
        with Locations((-24.971570197, 15)):
            Circle(SKETCH_30_R_2, mode=Mode.SUBTRACT)
    extrude(amount=EXTRUDE_8_DEPTH)

    # 草图31 → 凸台-拉伸9 (add)
    with BuildSketch(Plane(origin=(-3.464101615, 0, 2), x_dir=(0.500000000000004, 0, 0.8660254037844364), z_dir=(-0.8660254037844365, 0, 0.500000000000004))):
        with Locations((24.971570197, 15)):
            Circle(SKETCH_31_R)
        with Locations((24.971570197, 15)):
            Circle(SKETCH_31_R_2, mode=Mode.SUBTRACT)
    extrude(amount=-EXTRUDE_9_DEPTH)

    # 草图32 → 凸台-拉伸10 (add)
    with BuildSketch(Plane(origin=(-3.464101615, 0, -2), x_dir=(-0.49999999999999195, 0, 0.8660254037844434), z_dir=(-0.8660254037844434, 0, -0.49999999999999195)).offset(EXTRUDE_START)):
        with Locations((-24.971570197, 15)):
            Circle(SKETCH_32_R)
        with Locations((-24.971570197, 15)):
            Circle(SKETCH_32_R_2, mode=Mode.SUBTRACT)
    extrude(amount=EXTRUDE_10_DEPTH)

    # 草图33 → 切除-拉伸14 (cut)
    with BuildSketch(Plane(origin=(-3.464101615, 0, 2), x_dir=(0.500000000000004, 0, 0.8660254037844364), z_dir=(-0.8660254037844365, 0, 0.500000000000004))):
        with Locations((24.971570197, 15)):
            Circle(SKETCH_33_R)
    cut_extrude_14 = extrude(amount=-CUT_EXTRUDE_14_DEPTH, mode=Mode.SUBTRACT)

    # 阵列(圆周)13: 切除-拉伸14 ×3 about axis
    pattern_circular_13_axis = Axis((0, 0, 0), (0, 1, 0))
    for i in range(1, PATTERN_CIRCULAR_13_COUNT):
        add(cut_extrude_14.rotate(pattern_circular_13_axis, i * 360 / PATTERN_CIRCULAR_13_COUNT), mode=Mode.SUBTRACT)


solid = part.part
